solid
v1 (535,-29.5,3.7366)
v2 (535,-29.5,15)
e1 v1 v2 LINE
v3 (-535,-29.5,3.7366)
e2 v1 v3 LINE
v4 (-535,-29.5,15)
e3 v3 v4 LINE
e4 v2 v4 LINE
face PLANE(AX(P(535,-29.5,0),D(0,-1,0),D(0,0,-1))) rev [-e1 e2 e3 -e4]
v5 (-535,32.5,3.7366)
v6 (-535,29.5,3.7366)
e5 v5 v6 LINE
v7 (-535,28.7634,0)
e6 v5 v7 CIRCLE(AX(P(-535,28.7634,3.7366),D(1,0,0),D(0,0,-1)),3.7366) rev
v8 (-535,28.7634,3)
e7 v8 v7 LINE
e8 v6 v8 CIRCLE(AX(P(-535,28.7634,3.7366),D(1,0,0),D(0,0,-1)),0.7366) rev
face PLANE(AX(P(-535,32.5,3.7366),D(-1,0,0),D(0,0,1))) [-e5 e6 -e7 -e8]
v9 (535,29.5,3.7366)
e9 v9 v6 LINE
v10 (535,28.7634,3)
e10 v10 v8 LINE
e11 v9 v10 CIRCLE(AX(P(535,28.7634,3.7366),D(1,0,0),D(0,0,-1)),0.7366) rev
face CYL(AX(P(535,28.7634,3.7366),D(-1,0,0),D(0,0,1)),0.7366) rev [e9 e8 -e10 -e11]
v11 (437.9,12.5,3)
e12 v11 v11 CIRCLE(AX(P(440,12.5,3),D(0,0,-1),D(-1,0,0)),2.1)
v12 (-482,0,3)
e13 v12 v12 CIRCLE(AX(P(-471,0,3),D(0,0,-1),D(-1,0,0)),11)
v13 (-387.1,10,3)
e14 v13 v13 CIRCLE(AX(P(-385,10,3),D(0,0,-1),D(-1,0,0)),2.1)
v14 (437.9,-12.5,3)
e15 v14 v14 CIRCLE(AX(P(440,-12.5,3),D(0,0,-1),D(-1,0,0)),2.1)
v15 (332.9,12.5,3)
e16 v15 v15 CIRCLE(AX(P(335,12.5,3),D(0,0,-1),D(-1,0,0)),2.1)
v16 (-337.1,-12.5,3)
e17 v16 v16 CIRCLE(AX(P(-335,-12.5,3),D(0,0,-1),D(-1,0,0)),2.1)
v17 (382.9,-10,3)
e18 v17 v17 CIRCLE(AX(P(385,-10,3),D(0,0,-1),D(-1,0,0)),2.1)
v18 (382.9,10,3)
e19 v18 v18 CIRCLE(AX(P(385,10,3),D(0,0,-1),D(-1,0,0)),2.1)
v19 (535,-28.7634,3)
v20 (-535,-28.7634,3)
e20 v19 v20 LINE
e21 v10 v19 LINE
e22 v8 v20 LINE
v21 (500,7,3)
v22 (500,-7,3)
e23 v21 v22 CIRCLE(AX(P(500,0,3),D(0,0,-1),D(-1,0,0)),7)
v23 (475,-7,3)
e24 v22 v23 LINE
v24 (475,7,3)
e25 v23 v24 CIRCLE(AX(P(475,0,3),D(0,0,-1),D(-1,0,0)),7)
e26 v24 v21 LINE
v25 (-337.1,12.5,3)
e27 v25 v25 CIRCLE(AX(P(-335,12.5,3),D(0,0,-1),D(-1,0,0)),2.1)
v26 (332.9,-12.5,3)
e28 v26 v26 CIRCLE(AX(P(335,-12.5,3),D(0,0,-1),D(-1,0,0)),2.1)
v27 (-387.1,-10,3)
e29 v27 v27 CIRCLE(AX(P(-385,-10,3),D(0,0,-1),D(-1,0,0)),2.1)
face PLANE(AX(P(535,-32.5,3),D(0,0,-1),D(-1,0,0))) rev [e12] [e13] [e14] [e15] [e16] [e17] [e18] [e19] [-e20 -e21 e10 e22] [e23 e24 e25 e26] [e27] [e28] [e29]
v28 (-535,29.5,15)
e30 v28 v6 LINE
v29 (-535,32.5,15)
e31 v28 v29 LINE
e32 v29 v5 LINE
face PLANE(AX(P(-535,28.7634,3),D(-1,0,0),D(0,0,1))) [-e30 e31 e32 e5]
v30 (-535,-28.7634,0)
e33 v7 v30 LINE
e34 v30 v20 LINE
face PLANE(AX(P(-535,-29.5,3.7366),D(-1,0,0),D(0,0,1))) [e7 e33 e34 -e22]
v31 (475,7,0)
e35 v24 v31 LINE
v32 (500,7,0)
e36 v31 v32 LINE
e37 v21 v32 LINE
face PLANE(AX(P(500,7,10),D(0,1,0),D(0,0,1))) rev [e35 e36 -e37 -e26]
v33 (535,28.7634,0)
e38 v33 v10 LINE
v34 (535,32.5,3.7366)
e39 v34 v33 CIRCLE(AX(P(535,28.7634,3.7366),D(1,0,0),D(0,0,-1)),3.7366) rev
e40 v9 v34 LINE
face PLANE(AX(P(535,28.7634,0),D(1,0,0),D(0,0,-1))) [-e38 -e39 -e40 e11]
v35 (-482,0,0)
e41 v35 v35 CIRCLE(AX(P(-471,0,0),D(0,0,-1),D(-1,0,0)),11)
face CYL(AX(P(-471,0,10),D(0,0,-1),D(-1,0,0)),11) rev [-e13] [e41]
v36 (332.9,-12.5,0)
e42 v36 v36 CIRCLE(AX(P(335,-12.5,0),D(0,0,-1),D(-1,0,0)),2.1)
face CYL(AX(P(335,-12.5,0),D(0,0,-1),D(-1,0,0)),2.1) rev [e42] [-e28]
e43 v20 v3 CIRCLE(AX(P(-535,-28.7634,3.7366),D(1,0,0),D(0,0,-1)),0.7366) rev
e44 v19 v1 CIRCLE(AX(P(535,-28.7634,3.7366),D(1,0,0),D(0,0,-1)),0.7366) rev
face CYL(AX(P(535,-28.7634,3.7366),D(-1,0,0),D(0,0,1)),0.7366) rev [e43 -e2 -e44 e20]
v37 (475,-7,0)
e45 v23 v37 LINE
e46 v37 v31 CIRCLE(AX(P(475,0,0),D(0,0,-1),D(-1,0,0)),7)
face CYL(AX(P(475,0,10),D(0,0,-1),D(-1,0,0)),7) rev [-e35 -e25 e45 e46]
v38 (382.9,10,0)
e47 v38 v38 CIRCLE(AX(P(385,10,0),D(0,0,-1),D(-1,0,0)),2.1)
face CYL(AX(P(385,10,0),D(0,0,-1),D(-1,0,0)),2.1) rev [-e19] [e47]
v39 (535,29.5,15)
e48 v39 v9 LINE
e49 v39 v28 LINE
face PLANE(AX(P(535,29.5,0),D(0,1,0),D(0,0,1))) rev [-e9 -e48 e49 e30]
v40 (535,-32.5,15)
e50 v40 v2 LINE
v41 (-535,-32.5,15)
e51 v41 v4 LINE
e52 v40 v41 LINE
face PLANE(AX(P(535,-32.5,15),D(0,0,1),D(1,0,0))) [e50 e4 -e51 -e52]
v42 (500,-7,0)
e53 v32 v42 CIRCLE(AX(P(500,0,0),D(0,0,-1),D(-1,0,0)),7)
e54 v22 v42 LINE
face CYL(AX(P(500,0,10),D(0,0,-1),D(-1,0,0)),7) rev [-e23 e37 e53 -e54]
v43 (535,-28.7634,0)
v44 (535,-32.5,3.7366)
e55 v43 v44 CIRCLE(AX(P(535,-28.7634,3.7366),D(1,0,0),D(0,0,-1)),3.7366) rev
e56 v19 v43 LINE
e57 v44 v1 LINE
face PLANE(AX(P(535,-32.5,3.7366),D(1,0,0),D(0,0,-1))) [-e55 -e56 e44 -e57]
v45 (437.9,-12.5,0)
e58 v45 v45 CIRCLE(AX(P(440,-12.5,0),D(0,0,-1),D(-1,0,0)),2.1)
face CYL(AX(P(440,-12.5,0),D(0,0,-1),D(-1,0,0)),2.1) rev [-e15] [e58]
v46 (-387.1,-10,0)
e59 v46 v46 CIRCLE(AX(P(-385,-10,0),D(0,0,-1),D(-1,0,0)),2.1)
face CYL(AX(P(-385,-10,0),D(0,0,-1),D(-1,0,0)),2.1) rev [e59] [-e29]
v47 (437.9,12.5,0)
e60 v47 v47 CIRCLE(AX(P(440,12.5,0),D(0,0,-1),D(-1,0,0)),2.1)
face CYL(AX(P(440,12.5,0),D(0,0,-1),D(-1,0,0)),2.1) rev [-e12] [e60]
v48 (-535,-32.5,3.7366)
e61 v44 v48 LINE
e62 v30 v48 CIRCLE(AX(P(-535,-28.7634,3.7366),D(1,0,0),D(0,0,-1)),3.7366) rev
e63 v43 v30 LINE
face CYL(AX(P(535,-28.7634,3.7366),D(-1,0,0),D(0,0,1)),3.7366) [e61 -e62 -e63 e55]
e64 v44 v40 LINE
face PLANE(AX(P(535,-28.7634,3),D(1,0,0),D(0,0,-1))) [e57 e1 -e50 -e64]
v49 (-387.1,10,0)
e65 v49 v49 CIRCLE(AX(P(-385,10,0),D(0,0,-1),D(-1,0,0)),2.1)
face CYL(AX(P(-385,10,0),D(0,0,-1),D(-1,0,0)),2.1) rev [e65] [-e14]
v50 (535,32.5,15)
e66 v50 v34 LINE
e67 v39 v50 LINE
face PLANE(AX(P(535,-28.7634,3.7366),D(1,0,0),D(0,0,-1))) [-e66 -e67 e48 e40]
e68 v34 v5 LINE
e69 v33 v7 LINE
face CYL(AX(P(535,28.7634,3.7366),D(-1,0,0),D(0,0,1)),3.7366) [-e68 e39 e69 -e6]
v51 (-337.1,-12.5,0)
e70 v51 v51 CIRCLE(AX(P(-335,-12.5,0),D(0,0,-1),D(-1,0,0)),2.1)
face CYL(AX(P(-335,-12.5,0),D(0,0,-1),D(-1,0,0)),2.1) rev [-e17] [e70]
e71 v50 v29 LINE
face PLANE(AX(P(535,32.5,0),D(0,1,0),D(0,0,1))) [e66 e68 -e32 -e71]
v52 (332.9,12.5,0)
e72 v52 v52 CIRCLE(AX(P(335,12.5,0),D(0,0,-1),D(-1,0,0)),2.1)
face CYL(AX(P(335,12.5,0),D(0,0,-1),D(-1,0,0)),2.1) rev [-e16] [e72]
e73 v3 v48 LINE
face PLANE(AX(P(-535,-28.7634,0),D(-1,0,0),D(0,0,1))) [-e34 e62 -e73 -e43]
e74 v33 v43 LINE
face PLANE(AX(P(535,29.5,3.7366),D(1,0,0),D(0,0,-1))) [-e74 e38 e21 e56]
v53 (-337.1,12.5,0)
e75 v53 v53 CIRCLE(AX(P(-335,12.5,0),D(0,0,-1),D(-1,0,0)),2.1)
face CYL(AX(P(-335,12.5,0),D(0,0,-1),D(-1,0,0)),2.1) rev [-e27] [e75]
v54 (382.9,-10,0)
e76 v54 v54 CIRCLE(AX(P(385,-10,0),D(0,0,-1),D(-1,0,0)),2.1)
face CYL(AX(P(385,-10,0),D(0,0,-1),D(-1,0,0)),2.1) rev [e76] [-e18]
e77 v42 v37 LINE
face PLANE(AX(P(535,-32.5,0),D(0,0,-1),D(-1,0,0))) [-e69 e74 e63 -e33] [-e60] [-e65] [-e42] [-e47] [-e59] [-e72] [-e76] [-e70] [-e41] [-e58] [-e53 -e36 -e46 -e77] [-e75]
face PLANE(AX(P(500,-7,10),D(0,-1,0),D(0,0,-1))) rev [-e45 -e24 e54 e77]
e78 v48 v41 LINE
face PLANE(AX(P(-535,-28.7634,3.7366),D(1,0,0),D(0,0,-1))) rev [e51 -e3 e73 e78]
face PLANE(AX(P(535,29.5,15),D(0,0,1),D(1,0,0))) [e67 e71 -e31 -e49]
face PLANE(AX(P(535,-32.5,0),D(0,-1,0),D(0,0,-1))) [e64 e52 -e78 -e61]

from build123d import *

# Parameters (mm, degrees)
TABAN_FLAN_1_DEPTH    = 535
KES_EKSTR_ZYON1_DEPTH = 10
M5_DI_LI_DELIK1_D     = 4.2
M5_DI_LI_DELIK2_D     = 4.2
M5_DI_LI_DELIK3_D     = 4.2
IZIM13_R              = 11
KES_EKSTR_ZYON2_DEPTH = 10


# Sheet-metal steps are written as plain solids
with BuildPart() as part:
    # Çizim1 → Taban-Flanş1 (new, symmetric)
    with BuildSketch(Plane(origin=(0, 0, 0), x_dir=(0, 0, -1), z_dir=(1, 0, 0))):
        with BuildLine():
            Line((-15, -32.5), (-3.7366, -32.5))
            ThreePointArc((-3.7366, -32.5), (-1.094424801, -31.405575199), (0, -28.7634))
            Line((0, -28.7634), (0, 28.7634))
            ThreePointArc((0, 28.7634), (-1.094424801, 31.405575199), (-3.7366, 32.5))
            Line((-3.7366, 32.5), (-15, 32.5))
            Line((-15, 32.5), (-15, 29.5))
            Line((-15, 29.5), (-3.7366, 29.5))
            ThreePointArc((-3.7366, 29.5), (-3.215745145, 29.284254855), (-3, 28.7634))
            Line((-3, 28.7634), (-3, -28.7634))
            ThreePointArc((-3, -28.7634), (-3.215745145, -29.284254855), (-3.7366, -29.5))
            Line((-3.7366, -29.5), (-15, -29.5))
            Line((-15, -29.5), (-15, -32.5))
        make_face()
    extrude(amount=TABAN_FLAN_1_DEPTH, both=True)

    # Çizim6 → Kes-Ekstrüzyon1 (cut)
    with BuildSketch(Plane(origin=(0, 0, 0), x_dir=(-1, 0, 0), z_dir=(0, 0, -1))):
        with BuildLine():
            Line((-500, 7), (-475, 7))
            ThreePointArc((-475, 7), (-468, 0), (-475, -7))
            Line((-475, -7), (-500, -7))
            ThreePointArc((-500, -7), (-507, 0), (-500, 7))
        make_face()
    extrude(amount=-KES_EKSTR_ZYON1_DEPTH, mode=Mode.SUBTRACT)

    # M5 Dişli Delik1 (through all)
    with Locations(Plane(origin=(440, 12.5, 0), x_dir=(-1, 0, 0), z_dir=(0, 0, -1))):
        with Locations((0, 0), (0, -25)):
            Hole(M5_DI_LI_DELIK1_D / 2)

    # M5 Dişli Delik2 (through all)
    with Locations(Plane(origin=(385, 10, 0), x_dir=(-1, 0, 0), z_dir=(0, 0, -1))):
        with Locations((0, 0), (0, -20)):
            m5_di_li_delik2 = Hole(M5_DI_LI_DELIK2_D / 2)

    # M5 Dişli Delik3 (through all)
    with Locations(Plane(origin=(335, 12.5, 0), x_dir=(-1, 0, 0), z_dir=(0, 0, -1))):
        with Locations((0, 0), (0, -25)):
            m5_di_li_delik3 = Hole(M5_DI_LI_DELIK3_D / 2)

    # Aynalama1: M5 Dişli Delik2, M5 Dişli Delik3 across plane
    add(m5_di_li_delik2.mirror(Plane(origin=(0, 0, 0), x_dir=(0, 0, 1), z_dir=(1, 0, 0))), mode=Mode.SUBTRACT)
    add(m5_di_li_delik3.mirror(Plane(origin=(0, 0, 0), x_dir=(0, 0, 1), z_dir=(1, 0, 0))), mode=Mode.SUBTRACT)

    # Çizim13 → Kes-Ekstrüzyon2 (cut)
    with BuildSketch(Plane(origin=(0, 0, 0), x_dir=(-1, 0, 0), z_dir=(0, 0, -1))):
        with Locations((471, 0)):
            Circle(IZIM13_R)
    extrude(amount=-KES_EKSTR_ZYON2_DEPTH, mode=Mode.SUBTRACT)


solid = part.part
